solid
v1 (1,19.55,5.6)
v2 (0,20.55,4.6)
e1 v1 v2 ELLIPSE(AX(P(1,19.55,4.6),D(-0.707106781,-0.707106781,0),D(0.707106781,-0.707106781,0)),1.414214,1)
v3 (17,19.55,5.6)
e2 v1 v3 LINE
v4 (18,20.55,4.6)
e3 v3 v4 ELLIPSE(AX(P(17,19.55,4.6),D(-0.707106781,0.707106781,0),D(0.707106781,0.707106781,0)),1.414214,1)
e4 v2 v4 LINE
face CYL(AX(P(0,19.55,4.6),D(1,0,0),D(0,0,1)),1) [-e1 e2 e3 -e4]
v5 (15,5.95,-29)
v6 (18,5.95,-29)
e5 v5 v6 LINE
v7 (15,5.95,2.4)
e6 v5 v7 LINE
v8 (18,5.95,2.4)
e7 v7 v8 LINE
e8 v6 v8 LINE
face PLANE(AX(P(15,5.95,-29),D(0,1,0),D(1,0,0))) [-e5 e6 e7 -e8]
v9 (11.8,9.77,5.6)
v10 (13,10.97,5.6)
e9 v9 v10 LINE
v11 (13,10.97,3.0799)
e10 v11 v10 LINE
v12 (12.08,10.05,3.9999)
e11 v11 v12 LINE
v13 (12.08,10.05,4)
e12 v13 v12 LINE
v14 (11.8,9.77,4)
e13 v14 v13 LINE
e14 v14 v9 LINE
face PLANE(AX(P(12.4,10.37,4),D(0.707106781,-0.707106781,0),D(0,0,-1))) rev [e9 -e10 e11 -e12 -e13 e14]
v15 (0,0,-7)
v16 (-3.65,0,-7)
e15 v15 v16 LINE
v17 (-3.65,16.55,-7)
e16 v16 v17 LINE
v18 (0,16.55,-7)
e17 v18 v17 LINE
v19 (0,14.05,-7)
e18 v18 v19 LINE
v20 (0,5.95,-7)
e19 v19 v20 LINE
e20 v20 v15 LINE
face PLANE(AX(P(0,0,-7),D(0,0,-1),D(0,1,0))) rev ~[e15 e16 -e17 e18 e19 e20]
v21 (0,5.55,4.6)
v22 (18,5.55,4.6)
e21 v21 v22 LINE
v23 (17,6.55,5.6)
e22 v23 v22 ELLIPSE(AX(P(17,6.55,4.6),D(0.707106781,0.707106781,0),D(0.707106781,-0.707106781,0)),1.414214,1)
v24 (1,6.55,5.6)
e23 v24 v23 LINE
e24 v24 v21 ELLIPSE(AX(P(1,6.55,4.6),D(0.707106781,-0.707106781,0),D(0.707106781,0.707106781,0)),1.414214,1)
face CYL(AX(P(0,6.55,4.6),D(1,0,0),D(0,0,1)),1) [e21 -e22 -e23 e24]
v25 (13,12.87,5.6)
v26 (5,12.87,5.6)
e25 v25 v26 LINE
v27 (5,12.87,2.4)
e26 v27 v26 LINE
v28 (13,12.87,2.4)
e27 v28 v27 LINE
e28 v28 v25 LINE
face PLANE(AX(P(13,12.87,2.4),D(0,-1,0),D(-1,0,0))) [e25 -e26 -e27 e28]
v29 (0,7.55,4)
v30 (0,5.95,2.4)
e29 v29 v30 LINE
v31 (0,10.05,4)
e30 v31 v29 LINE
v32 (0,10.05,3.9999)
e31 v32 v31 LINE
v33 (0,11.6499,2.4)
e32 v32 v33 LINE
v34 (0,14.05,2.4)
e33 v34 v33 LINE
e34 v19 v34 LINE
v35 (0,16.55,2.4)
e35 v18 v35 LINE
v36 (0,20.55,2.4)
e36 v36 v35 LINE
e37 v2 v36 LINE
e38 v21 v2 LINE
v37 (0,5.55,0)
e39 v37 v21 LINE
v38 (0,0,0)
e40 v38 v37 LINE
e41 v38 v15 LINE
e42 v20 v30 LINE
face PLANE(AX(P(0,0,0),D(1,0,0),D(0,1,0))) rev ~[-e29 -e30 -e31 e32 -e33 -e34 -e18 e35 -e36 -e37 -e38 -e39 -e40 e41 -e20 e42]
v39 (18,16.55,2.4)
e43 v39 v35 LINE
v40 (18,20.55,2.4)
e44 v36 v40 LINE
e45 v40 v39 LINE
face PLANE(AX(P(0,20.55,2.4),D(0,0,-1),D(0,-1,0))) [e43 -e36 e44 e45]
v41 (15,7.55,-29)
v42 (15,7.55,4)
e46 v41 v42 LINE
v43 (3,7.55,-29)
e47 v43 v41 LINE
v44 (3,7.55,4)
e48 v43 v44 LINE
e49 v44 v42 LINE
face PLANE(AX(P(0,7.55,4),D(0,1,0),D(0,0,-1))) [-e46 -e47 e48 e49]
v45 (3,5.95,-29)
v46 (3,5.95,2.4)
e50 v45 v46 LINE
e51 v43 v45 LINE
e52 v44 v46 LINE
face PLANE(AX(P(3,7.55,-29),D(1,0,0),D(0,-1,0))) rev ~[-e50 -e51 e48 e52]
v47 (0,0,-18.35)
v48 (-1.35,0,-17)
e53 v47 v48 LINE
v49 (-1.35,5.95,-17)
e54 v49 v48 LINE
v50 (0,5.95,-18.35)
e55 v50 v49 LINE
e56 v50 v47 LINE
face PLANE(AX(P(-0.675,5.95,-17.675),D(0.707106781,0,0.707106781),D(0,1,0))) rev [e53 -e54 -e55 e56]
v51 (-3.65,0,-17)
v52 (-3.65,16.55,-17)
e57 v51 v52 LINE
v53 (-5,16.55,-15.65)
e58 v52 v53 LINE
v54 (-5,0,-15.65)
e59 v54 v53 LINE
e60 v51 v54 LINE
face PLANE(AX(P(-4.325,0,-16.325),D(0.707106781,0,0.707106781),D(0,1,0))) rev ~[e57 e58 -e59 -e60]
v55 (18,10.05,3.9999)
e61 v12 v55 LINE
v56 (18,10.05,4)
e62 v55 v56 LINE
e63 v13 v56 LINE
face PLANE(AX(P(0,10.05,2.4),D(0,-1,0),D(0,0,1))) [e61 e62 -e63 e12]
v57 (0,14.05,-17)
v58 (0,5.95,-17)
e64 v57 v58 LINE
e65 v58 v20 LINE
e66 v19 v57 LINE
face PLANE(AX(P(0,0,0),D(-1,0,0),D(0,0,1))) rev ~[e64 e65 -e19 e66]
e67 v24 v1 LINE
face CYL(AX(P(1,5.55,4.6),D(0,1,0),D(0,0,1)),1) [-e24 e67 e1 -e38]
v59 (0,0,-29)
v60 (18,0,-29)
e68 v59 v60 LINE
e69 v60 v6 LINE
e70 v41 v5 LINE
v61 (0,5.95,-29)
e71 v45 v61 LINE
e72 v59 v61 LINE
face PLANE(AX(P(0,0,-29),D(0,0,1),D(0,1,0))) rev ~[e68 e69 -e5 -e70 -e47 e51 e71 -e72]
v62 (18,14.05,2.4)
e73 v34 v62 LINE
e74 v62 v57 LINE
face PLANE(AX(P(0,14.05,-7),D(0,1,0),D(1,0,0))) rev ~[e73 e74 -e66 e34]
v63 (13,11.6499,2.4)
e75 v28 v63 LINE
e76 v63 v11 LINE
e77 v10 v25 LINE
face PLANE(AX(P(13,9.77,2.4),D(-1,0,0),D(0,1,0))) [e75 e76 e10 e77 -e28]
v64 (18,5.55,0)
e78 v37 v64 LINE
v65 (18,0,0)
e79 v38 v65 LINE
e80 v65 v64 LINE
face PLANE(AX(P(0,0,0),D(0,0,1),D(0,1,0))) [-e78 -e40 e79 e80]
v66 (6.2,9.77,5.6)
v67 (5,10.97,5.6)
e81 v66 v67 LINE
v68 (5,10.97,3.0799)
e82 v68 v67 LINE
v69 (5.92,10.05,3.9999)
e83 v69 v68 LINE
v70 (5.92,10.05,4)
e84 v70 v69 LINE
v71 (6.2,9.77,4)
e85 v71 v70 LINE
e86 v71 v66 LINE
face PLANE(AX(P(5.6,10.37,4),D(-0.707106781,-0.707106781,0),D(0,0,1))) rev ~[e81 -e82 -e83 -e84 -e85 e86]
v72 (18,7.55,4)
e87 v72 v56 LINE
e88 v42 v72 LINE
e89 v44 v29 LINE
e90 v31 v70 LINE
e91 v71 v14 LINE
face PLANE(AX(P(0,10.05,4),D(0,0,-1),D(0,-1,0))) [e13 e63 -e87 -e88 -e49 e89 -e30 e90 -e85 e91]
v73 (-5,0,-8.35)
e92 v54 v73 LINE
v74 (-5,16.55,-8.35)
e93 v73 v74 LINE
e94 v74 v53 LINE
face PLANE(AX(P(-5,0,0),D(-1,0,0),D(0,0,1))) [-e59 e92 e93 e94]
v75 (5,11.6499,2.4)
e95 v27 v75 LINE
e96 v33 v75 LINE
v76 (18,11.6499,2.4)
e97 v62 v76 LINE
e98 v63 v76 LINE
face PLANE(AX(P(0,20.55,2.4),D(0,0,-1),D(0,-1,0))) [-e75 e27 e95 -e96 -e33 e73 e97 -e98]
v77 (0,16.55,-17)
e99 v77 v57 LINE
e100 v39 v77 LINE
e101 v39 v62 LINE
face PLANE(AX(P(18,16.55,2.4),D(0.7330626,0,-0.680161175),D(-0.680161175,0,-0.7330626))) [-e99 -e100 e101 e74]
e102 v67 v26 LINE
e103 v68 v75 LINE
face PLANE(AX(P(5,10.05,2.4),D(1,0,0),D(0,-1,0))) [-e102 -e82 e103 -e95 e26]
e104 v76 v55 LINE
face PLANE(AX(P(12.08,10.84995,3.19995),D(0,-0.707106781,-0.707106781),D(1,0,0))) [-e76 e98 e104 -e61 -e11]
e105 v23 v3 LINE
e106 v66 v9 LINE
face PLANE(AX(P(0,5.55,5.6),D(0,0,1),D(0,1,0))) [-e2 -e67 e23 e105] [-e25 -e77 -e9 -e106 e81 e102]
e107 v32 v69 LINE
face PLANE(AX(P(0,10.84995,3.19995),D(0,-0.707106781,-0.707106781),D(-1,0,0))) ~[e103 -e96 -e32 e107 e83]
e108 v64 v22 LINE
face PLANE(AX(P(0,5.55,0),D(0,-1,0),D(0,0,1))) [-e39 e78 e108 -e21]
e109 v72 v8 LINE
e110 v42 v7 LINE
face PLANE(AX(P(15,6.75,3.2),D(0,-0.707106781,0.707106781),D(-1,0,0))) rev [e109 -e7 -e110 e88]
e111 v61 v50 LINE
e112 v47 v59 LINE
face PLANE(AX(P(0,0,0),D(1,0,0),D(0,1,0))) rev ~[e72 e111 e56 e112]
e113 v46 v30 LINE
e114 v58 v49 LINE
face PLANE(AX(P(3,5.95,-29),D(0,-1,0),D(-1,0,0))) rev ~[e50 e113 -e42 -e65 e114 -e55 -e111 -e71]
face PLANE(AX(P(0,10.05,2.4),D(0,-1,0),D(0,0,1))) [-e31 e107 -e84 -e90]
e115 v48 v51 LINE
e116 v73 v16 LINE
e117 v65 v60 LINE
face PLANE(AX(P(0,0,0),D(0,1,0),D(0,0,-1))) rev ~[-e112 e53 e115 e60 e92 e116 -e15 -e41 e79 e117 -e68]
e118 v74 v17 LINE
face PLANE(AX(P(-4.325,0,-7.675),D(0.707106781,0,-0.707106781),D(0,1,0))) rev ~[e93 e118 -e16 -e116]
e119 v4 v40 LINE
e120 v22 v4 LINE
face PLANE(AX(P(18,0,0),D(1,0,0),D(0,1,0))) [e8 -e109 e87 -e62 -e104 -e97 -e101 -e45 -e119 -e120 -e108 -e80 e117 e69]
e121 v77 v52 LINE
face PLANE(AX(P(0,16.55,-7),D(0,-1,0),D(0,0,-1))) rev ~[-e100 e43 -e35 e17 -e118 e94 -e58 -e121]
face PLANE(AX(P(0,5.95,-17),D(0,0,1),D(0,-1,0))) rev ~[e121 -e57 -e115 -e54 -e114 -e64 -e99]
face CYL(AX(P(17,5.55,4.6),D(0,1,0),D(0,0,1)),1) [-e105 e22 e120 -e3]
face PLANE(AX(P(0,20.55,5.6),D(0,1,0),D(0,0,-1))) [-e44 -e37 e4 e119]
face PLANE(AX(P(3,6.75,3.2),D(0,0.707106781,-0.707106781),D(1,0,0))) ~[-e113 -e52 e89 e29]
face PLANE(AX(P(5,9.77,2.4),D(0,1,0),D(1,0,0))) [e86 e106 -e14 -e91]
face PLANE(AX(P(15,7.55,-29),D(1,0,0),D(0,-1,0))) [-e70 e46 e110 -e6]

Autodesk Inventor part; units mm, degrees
ref_plane "YZ Plane" through (0, 0, 0) normal (1, 0, 0) x (0, 1, 0)
ref_plane "XZ Plane" through (0, 0, 0) normal (0, 1, 0) x (-1, 0, 0)
ref_plane "XY Plane" through (0, 0, 0) normal (0, 0, 1) x (1, 0, 0)
sketch "Sketch1" plane through (0, 0, 0) normal (1, 0, 0) x (0, 1, 0)
  line L0 (0, 0) -> (5.55, 0)
  line L1 (5.55, 0) -> (5.55, 5.6)
  line L2 (5.55, 5.6) -> (20.55, 5.6)
  line L3 (20.55, 5.6) -> (20.55, 2.4)
  line L4 (20.55, 2.4) -> (10.05, 2.4)
  line L5 (10.05, 2.4) -> (10.05, 4)
  line L6 (10.05, 4) -> (7.55, 4)
  line L7 (7.55, 4) -> (7.55, -29)
  line L8 (0, 0) -> (0, -29)
  line L9 (0, -29) -> (7.55, -29)
  dimension "d1" = 5.55
  dimension "d2" = 15
  dimension "d3" = 2
  dimension "d4" = 2.5
  dimension "d5" = 1.6
  dimension "d6" = 29
  dimension "d7" = 33
  dimension "d8" = 3.2
extrude "Extrusion1" add sketch "Sketch1" along normal blind 18
sketch "Sketch2" plane through (0, 10.05, 2.4) normal (0, 0, -1) x (-1, 0, 0)
  line L0 (0, 0) -> (-18, 0) projected
  line L1 (-9, 0) -> (-9, -5.1044) construction
  line L2 (-13, 2.82) -> (-5, 2.82)
  line L3 (-5, 2.82) -> (-5, -0.28)
  line L4 (-5, -0.28) -> (-13, -0.28)
  line L5 (-13, -0.28) -> (-13, 2.82)
  point P0 (0, -10.05)
  point P1 (-9, -0.28)
  dimension "d11" = 3.1
  dimension "d12" = 8
extrude "Extrusion2" cut sketch "Sketch2" against normal up to surface (3.2 mm away)
chamfer "Chamfer1" distance 1.2 angle 45 2 edges at (5, 9.77, 4.8) (13, 9.77, 4.8)
chamfer "Chamfer2" distance 1.6 angle 45 2 edges at (15.04, 10.05, 2.4) (2.96, 10.05, 2.4)
fillet "Fillet1" radius 1 4 edges at (9, 5.55, 5.6) (9, 20.55, 5.6) (18, 13.05, 5.6) (0, 13.05, 5.6)
sketch "Sketch3" plane through (0, 0, -29) normal (0, 0, -1) x (-1, 0, 0)
  line L0 (0, 7.55) -> (-18, 7.55) projected
  line L1 (-9, 7.55) -> (-9, 5.1292) construction
  line L2 (-18, 7.55) -> (-15, 7.55)
  line L3 (-15, 7.55) -> (-15, 5.95)
  line L4 (-15, 5.95) -> (-18, 5.95)
  line L5 (-18, 5.95) -> (-18, 7.55)
  line L6 (0, 7.55) -> (-3, 7.55)
  line L7 (-3, 7.55) -> (-3, 5.95)
  line L8 (-3, 5.95) -> (0, 5.95)
  line L9 (0, 5.95) -> (0, 7.55)
  line L10 (0, 7.55) -> (-18, 7.55) projected
  line L11 (-18, 0) -> (-18, 7.55) projected
  point P0 (0, 0)
  dimension "d22" = 3
  dimension "d23" = 1.6
extrude "Extrusion3" cut sketch "Sketch3" against normal up to surface (33 mm away)
chamfer "Chamfer3" distance 1.6 angle 45 2 edges at (16.5, 5.95, 4) (1.5, 5.95, 4)
sketch "Sketch4" plane through (0, 0, 0) normal (-1, 0, 0) x (0, 0, 1)
  line L0 (-17, 0) -> (-7, 0)
  line L1 (-7, 0) -> (-7, 16.55)
  line L2 (-7, 16.55) -> (-17, 16.55)
  line L3 (-17, 16.55) -> (-17, 0)
  line L4 (2.4, 5.95) -> (-29, 5.95) projected
  line L5 (-29, 0) -> (0, 0) projected
  line L6 (0, 0) -> (0, 5.55) projected
  line L7 (4.6, 20.55) -> (2.4, 20.55) projected
  dimension "d29" = 10
  dimension "d30" = 7
  dimension "d31" = 4
extrude "Extrusion4" add sketch "Sketch4" along normal blind 5
sketch "Sketch5" plane through (0, 16.55, -7) normal (0, 1, 0) x (1, 0, 0)
  line L0 (0, -9.4) -> (18, -9.4) projected
  line L1 (0, 0) -> (-5, 0) projected
  line L2 (0, 0) -> (0, 10) projected
  line L3 (0, 10) -> (-5, 10) projected
  line L4 (-5, 0) -> (-5, 10) projected
  line L5 (0, 10) -> (0, 22) projected
  line L6 (-5, 10) -> (-5, 0) projected
  line L7 (0, 10) -> (-5, 10)
  line L8 (-5, 10) -> (-5, 0)
  line L9 (-5, 0) -> (0, 0)
  line L10 (13, -9.4) -> (5, -9.4) projected
  line L11 (13, -9.4) -> (18, -9.4) projected
  line L12 (5, -9.4) -> (18, -9.4)
  line L13 (18, -9.4) -> (0, 10)
  line L14 (3, -9.4) -> (0, -9.4) projected
  line L15 (0, 0) -> (0, -9.4)
  line L16 (0, -9.4) -> (18, -9.4)
  point P0 (0, -7)
extrude "Extrusion5" add sketch "Sketch5" against normal blind 2.5
chamfer "Chamfer4" distance 1.35 angle 45 3 edges at (-5, 8.275, -7) (-5, 8.275, -17) (0, 2.975, -17)
properties part number "pro_micro_mount"
